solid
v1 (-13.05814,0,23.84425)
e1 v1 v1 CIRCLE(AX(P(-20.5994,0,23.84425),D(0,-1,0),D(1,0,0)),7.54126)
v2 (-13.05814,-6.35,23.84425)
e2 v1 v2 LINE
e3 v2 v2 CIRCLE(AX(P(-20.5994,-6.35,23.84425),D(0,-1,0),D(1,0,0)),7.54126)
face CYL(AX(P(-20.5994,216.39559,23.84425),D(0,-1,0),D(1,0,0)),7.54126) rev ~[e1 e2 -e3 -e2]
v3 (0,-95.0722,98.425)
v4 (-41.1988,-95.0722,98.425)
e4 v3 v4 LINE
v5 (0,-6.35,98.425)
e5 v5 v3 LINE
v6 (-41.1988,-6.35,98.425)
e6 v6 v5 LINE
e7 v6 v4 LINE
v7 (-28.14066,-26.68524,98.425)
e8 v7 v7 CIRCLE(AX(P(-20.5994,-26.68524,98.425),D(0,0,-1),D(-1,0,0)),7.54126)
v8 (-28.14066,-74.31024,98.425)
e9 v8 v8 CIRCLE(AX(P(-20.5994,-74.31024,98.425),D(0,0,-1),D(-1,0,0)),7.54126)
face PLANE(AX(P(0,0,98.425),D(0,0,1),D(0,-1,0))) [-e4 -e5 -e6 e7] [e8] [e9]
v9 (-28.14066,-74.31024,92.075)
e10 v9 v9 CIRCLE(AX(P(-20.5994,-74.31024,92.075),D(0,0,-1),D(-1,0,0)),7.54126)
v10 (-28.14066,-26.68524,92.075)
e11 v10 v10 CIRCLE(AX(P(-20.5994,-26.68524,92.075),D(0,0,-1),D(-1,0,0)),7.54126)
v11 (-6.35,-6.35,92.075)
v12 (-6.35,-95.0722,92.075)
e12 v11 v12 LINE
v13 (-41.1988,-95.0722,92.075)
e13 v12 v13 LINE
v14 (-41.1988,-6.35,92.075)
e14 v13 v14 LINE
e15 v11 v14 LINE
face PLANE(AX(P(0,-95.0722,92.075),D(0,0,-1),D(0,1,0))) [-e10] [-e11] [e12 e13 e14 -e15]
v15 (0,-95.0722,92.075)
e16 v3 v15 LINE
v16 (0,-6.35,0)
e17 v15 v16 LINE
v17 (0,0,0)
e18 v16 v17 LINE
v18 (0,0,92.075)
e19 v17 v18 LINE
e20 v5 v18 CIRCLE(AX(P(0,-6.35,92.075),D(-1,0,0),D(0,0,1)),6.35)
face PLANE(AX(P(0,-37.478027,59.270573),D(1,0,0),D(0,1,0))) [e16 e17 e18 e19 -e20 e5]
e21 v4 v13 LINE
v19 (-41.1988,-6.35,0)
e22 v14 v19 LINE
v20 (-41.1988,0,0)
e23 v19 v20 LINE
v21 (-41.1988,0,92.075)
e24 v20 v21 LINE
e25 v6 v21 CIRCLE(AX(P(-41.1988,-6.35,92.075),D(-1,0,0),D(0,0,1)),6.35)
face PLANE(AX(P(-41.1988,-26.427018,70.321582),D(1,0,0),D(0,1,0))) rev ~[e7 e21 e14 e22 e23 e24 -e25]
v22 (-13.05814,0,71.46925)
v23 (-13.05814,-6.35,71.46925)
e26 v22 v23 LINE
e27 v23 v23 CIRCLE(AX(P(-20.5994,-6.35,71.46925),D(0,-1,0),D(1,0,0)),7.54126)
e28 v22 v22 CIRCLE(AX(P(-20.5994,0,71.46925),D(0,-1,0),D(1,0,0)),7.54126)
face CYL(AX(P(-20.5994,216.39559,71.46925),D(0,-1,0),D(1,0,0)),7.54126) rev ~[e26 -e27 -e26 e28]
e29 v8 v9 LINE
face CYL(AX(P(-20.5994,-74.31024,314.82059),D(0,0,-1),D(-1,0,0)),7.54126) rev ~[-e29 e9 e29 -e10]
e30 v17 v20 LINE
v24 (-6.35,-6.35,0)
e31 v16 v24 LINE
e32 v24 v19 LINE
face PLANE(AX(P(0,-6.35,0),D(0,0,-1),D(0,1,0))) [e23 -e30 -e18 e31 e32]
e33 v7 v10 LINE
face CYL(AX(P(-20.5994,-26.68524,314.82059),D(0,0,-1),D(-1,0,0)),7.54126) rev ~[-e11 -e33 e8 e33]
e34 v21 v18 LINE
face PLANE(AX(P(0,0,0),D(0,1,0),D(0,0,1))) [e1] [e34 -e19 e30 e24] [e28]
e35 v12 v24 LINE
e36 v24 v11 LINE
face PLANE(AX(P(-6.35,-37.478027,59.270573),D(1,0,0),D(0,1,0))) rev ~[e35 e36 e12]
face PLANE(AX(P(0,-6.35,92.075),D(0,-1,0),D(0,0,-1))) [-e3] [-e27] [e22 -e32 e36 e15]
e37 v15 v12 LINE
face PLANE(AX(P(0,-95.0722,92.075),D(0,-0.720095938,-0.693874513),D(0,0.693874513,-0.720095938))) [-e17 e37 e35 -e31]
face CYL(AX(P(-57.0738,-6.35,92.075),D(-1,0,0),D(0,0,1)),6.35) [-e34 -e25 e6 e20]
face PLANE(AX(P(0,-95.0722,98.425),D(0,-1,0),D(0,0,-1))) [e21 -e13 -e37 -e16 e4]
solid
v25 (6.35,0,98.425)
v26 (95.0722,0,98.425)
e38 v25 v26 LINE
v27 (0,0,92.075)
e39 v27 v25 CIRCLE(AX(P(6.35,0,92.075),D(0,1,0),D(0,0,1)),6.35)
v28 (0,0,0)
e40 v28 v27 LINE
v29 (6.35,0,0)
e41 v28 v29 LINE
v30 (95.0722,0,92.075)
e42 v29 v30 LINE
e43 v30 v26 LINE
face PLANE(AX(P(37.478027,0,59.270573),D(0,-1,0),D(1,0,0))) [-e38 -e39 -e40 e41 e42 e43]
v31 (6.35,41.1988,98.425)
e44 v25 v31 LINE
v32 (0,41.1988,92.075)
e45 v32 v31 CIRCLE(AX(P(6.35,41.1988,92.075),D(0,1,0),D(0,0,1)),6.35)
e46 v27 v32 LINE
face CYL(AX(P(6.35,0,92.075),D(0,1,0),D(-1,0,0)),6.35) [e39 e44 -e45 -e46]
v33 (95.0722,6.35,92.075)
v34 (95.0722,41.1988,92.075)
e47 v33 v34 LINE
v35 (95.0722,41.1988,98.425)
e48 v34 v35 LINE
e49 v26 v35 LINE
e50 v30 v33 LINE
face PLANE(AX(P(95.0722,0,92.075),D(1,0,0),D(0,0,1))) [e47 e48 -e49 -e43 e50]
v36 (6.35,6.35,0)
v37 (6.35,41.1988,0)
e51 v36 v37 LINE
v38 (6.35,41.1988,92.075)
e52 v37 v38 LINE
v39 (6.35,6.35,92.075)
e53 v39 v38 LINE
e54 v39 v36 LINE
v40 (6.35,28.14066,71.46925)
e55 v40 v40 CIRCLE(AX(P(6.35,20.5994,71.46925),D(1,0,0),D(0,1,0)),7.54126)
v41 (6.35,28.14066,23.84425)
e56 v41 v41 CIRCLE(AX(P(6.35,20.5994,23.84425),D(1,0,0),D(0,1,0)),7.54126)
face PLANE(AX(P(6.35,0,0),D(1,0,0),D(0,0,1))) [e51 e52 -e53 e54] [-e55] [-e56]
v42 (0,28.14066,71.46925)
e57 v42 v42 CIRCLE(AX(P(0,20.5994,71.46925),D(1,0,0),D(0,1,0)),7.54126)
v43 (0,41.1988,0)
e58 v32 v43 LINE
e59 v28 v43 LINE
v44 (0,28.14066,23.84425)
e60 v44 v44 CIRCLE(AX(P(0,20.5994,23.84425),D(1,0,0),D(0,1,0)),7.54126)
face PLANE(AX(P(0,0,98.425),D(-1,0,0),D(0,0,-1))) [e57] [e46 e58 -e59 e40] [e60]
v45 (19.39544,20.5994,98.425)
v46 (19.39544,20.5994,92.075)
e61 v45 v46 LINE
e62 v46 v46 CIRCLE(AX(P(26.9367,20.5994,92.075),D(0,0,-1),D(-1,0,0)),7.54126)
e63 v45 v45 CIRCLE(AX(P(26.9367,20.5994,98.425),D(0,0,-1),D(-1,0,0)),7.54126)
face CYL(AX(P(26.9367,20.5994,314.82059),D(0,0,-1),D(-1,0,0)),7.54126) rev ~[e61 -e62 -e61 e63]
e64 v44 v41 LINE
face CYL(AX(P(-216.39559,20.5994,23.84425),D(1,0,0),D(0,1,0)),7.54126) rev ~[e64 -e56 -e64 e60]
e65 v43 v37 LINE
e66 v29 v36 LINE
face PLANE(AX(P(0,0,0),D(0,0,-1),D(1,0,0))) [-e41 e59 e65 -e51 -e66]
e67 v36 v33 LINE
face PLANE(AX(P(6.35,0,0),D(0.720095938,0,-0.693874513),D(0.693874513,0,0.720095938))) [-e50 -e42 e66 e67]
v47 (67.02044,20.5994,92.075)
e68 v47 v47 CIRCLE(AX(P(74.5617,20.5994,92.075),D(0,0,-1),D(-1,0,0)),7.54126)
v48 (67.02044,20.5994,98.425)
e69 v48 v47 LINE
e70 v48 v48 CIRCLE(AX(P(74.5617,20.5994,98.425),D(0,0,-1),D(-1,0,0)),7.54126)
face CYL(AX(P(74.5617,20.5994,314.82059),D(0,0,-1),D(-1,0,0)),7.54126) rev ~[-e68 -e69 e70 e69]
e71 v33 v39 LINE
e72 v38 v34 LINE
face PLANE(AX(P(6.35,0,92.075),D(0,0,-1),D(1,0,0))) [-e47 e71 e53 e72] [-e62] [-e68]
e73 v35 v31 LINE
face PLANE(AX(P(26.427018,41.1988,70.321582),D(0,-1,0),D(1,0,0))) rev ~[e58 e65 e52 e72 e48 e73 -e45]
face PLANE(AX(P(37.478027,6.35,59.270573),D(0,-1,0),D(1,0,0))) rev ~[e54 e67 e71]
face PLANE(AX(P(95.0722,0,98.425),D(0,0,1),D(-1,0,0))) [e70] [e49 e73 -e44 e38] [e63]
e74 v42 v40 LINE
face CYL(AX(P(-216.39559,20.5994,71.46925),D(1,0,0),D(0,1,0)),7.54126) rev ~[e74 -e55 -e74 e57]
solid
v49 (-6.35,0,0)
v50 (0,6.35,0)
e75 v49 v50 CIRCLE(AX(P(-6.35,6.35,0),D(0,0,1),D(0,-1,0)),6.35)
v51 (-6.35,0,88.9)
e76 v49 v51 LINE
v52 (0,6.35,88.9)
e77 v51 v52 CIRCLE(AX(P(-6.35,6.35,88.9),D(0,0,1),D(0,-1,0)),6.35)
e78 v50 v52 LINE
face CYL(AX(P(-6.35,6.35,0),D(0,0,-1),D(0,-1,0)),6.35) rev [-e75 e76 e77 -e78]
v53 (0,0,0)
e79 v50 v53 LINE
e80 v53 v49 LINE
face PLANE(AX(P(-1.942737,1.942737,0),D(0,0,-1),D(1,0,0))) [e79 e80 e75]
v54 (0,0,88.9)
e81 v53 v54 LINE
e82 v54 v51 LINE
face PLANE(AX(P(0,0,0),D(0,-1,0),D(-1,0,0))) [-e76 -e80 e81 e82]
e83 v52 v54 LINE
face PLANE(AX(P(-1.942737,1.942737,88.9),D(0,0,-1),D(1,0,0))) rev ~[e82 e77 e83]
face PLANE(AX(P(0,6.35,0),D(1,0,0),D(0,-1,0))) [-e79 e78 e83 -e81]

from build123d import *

# Parameters (mm, degrees)
F1_DEPTH     = 41.1988
F3_DEPTH     = 41.1988
F4_T1_DEPTH  = 72.9488
F5_R         = 6.35
F14_D        = 15.08252
F14_ON_F9_D  = 15.08252
F14_ON_F11_D = 15.08252
F14_ON_F13_D = 15.08252
F17_DEPTH    = 88.9
F20_DEPTH    = 6.35
F23_DEPTH    = 6.35


# Not quite as in the source:
# - a fillet or chamfer that OpenCascade refuses, or shapes differently, is made with other operations: its cross-section is extruded or revolved along the edge and cut away or added


with BuildPart() as f1:
    # F0 (on Right) → F1 (new body)
    with BuildSketch(Plane.YZ):
        Polygon((0, 98.425), (-95.0722, 98.425), (-95.0722, 92.075), (-6.35, 92.075), (-6.35, 0), (0, 0), align=None)
    extrude(amount=-F1_DEPTH)

    # F2 (on Front) → F3 (join)
    with BuildSketch(Plane.XZ):
        Polygon((95.0722, 92.075), (95.0722, 98.425), (0, 98.425), (0, 0), (6.35, 0), (6.35, 92.075), align=None)
    extrude(amount=-F3_DEPTH)

    # F4: fillet of radius 6.35 on 1 edges, made by hand

    # F4_s2 → F4_t1 (cut)
    with BuildSketch(Plane.YZ.offset(-57.0738)):
        with BuildLine():
            ThreePointArc((-6.35, 98.425), (-1.8598719395, 96.5651280605), (0, 92.075))
            Line((0, 92.075), (0, 98.425))
            Line((0, 98.425), (-6.35, 98.425))
        make_face()
    extrude(amount=F4_T1_DEPTH, mode=Mode.SUBTRACT)

    # F5
    f5_edges = [f1.edges().sort_by_distance(p)[0] for p in [
        (0, 20.5994, 98.425),
    ]]
    fillet(f5_edges, radius=F5_R)

    # F14 (through all)
    with Locations(Plane(origin=(0, 0, 0), x_dir=(-1, 0, 0), z_dir=(0, 1, 0))):
        with Locations((20.5994, 23.84425), (20.5994, 71.46925)):
            Hole(F14_D / 2)

    # F14 on F9 (through all)
    with Locations(Plane.XY.offset(98.425)):
        with Locations((-20.5994, -26.68524), (-20.5994, -74.31024)):
            Hole(F14_ON_F9_D / 2)

    # F14 on F11 (through all)
    with Locations(Plane(origin=(0, 0, 0), x_dir=(0, -1, 0), z_dir=(-1, 0, 0))):
        with Locations((-20.5994, 23.84425), (-20.5994, 71.46925)):
            Hole(F14_ON_F11_D / 2)

    # F14 on F13 (through all)
    with Locations(Plane.XY.offset(98.425)):
        with Locations((26.9367, 20.5994), (74.5617, 20.5994)):
            Hole(F14_ON_F13_D / 2)

    # F19 (on offset) → F20 (join)
    with BuildSketch(Plane.YZ):
        Polygon((-6.35, 0), (-6.35, 92.075), (-95.0722, 92.075), align=None)
    extrude(amount=-F20_DEPTH)

    # F22 (on offset) → F23 (join)
    with BuildSketch(Plane.XZ):
        Polygon((95.0722, 92.075), (6.35, 92.075), (6.35, 0), align=None)
    extrude(amount=-F23_DEPTH)


with BuildPart() as f17:
    # F16 (on offset) → F17 (new body)
    with BuildSketch(Plane(origin=(0, 0, 0), x_dir=(1, 0, 0), z_dir=(0, 0, -1))):
        with BuildLine():
            ThreePointArc((-6.35, 0), (-1.8598719395, -1.8598719395), (0, -6.35))
            Line((0, -6.35), (0, 0))
            Line((0, 0), (-6.35, 0))
        make_face()
    extrude(amount=-F17_DEPTH)


solid = Compound([f1.part, f17.part])
